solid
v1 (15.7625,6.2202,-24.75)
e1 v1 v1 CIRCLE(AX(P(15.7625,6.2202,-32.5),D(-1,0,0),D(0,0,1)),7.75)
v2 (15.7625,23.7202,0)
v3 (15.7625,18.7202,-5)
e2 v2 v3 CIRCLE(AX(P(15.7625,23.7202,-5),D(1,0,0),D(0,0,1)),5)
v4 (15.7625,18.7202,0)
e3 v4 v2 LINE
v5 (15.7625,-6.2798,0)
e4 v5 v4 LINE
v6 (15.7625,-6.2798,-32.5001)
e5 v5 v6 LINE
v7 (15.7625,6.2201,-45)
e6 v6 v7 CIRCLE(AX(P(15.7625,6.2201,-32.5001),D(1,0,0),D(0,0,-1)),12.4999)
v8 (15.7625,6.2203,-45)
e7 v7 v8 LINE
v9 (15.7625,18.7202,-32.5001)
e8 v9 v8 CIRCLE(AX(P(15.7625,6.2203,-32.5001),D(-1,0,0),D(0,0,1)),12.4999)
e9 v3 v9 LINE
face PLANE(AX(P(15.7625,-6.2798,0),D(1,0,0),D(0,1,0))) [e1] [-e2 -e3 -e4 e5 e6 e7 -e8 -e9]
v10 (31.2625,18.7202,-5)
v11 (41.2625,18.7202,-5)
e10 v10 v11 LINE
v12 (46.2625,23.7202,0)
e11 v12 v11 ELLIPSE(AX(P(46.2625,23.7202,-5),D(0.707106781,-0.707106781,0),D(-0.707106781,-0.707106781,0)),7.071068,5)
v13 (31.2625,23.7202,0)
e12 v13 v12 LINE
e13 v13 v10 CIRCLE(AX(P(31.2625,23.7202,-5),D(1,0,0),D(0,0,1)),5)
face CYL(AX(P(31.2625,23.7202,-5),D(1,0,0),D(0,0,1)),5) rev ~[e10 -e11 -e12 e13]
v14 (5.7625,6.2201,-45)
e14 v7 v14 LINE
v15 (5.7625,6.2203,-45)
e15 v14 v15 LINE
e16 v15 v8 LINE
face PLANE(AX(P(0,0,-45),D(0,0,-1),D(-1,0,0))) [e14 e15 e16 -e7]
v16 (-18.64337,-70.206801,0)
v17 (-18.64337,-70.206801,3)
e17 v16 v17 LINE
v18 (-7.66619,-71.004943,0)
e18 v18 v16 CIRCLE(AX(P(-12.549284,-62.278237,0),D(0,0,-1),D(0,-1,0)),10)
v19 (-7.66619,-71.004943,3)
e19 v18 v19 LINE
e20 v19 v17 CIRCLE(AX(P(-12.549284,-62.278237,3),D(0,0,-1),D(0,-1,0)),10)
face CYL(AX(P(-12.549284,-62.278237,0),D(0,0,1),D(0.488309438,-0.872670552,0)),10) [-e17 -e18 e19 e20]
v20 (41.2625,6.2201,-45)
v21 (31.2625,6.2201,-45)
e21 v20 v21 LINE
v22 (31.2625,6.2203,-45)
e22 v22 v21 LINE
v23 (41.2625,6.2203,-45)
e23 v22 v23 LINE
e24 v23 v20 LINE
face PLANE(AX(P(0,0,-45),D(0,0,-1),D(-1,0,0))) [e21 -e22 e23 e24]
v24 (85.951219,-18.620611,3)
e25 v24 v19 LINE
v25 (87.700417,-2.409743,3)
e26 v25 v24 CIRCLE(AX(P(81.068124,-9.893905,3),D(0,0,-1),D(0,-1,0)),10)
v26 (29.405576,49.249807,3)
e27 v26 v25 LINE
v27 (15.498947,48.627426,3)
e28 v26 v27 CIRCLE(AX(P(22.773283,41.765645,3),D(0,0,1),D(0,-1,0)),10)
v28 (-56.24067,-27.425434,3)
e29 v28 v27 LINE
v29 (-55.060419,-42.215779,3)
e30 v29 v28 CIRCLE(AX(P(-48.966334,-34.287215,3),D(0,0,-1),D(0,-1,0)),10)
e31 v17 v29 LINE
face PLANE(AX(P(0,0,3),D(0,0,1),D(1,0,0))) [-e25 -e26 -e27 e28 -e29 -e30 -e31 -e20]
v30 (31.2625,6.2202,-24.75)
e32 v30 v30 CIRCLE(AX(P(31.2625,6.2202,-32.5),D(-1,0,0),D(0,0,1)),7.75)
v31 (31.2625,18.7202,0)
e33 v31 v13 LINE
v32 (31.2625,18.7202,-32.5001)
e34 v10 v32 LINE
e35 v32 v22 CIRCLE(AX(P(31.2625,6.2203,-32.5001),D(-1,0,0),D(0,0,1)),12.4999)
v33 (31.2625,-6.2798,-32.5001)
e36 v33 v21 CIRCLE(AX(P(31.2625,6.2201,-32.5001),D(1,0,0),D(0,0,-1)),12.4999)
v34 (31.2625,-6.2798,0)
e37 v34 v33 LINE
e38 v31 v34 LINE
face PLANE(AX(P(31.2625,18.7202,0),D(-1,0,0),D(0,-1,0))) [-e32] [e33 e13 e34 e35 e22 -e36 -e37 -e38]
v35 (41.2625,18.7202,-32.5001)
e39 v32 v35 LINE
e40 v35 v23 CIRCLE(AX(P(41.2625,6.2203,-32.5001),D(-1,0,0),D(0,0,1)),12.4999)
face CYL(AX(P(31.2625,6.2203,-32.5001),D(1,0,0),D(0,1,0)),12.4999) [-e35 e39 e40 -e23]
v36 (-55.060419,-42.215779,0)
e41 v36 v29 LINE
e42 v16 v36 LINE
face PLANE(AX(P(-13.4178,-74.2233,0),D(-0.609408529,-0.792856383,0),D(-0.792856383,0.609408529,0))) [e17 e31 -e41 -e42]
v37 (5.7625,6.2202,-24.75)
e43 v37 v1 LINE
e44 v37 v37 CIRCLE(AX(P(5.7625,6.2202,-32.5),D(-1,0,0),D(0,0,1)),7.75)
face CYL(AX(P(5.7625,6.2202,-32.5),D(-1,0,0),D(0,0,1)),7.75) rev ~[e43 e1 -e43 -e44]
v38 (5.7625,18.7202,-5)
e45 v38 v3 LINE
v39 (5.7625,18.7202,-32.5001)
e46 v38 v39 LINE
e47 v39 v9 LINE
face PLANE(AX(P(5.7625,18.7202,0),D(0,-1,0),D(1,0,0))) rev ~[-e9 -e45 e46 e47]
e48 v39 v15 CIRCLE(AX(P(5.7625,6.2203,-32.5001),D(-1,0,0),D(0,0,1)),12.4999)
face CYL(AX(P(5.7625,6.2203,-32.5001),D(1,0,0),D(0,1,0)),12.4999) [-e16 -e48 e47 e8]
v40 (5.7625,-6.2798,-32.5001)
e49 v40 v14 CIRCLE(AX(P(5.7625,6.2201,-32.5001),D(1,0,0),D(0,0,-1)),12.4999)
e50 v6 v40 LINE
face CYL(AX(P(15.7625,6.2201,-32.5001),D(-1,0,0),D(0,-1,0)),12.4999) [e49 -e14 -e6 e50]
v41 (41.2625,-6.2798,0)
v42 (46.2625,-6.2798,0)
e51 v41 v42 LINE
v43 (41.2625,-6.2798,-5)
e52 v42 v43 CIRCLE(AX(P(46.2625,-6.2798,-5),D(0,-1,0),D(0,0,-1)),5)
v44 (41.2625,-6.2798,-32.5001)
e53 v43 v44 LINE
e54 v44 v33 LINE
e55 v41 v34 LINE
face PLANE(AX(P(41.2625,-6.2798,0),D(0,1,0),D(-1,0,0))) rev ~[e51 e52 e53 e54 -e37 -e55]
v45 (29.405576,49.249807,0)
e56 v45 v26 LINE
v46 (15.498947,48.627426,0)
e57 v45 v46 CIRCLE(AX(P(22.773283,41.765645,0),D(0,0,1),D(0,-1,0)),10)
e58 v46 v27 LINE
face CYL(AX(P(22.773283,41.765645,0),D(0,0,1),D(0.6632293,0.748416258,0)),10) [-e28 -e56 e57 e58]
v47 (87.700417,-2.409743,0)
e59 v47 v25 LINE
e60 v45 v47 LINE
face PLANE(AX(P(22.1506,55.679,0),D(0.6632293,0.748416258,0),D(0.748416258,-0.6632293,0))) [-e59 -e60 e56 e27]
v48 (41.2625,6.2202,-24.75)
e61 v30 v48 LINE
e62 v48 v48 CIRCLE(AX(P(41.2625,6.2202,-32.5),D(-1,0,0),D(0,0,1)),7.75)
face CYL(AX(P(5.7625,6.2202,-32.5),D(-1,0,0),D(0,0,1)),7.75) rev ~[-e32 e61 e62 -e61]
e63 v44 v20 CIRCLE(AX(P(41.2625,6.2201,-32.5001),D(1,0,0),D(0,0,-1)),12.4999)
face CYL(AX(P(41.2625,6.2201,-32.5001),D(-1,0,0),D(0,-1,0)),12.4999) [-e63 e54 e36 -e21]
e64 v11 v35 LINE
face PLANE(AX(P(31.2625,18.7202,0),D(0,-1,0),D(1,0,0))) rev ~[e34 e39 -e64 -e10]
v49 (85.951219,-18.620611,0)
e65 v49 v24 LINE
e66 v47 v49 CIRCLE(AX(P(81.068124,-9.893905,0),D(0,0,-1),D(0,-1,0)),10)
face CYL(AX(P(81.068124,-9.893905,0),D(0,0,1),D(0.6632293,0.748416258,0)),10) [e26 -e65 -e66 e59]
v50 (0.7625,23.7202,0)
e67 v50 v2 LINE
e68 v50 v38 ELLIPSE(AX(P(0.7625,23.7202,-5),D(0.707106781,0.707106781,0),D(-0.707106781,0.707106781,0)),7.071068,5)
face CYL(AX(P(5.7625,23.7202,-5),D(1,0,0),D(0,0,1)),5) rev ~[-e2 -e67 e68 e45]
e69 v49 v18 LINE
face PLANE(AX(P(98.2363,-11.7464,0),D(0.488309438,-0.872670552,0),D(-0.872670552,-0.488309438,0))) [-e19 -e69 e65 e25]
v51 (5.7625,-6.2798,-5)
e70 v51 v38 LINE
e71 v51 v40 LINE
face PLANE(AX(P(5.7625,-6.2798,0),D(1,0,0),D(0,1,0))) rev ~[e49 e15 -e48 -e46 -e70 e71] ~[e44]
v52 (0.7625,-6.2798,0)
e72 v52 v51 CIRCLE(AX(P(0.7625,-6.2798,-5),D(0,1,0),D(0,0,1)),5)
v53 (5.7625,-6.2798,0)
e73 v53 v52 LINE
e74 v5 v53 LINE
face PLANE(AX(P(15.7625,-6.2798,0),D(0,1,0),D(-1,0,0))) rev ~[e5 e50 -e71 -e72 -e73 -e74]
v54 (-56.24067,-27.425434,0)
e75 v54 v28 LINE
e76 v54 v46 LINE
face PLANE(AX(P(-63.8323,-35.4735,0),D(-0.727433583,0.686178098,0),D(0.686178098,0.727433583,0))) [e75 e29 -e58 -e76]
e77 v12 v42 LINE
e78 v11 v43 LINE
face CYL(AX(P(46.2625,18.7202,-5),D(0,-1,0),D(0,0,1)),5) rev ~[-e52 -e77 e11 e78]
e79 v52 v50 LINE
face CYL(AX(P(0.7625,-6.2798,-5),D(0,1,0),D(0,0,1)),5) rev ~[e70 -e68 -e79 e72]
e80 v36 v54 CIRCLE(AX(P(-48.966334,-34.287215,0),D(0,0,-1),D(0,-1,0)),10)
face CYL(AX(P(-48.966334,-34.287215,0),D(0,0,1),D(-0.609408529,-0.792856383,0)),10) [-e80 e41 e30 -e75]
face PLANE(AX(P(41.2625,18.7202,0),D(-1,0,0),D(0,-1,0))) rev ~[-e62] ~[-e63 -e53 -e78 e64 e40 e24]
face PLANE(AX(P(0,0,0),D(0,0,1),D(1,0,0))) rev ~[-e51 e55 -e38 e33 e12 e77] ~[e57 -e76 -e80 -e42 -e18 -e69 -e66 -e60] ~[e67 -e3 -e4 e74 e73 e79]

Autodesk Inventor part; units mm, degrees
ref_plane "YZ Plane" through (0, 0, 0) normal (1, 0, 0) x (0, 1, 0)
ref_plane "XZ Plane" through (0, 0, 0) normal (0, 1, 0) x (-1, 0, 0)
ref_plane "XY Plane" through (0, 0, 0) normal (0, 0, 1) x (1, 0, 0)
sketch "Sketch1" plane through (0, 0, 0) normal (0, 0, 1) x (1, 0, 0)
  line L0 (22.1506, 55.679) -> (98.2363, -11.7464)
  line L1 (98.2363, -11.7464) -> (-13.4178, -74.2233)
  line L2 (-13.4178, -74.2233) -> (-63.8323, -35.4735)
  line L3 (-63.8323, -35.4735) -> (22.1506, 55.679)
  point P0 (0, 0)
extrude "Extrusion1" add sketch "Sketch1" along normal blind 3
fillet "Fillet1" radius 10 4 edges at (98.2363, -11.7464, 1.5) (-13.4178, -74.2233, 1.5) (22.1506, 55.679, 1.5) (-63.8323, -35.4735, 1.5)
sketch "Sketch2" plane through (0, 0, 0) normal (0, 0, -1) x (-1, 0, 0)
  line L0 (-41.2625, -6.2798) -> (-5.7625, -6.2798)
  line L1 (-5.7625, -6.2798) -> (-5.7625, 18.7202)
  line L2 (-5.7625, 18.7202) -> (-41.2625, 18.7202)
  line L3 (-41.2625, 18.7202) -> (-41.2625, -6.2798)
  line L4 (-41.2625, -6.2798) -> (-5.7625, 18.7202) construction
  line L5 (-5.7625, -6.2798) -> (-41.2625, 18.7202) construction
  line L6 (-31.2625, -6.2798) -> (-15.7625, -6.2798)
  line L7 (-15.7625, -6.2798) -> (-15.7625, 18.7202)
  line L8 (-15.7625, 18.7202) -> (-31.2625, 18.7202)
  line L9 (-31.2625, 18.7202) -> (-31.2625, -6.2798)
  line L10 (-31.2625, -6.2798) -> (-15.7625, 18.7202) construction
  line L11 (-15.7625, -6.2798) -> (-31.2625, 18.7202) construction
  point P0 (0, 0)
  point P1 (-23.5125, 6.2202)
  point P2 (-31.2625, -6.2798)
  point P3 (-15.7625, -6.2798)
  dimension "d3" = 10
  dimension "d4" = 25
  dimension "d8" = 15.5
extrude "Extrusion2" add sketch "Sketch2" along normal blind 45 contours L3 L2 L9 L0 | L7 L2 L1 L0
fillet "Fillet2" radius 12.5 4 edges at (10.7625, 18.7202, -45) (36.2625, 18.7202, -45) (10.7625, -6.2798, -45) (36.2625, -6.2798, -45)
sketch "Sketch3" plane through (5.7625, -6.2798, 0) normal (-1, 0, 0) x (0, 0, 1)
  arc A0 (-32.5, 25) -> (-32.5, 0) centre (-32.5, 12.5) ccw projected
  circle A1 centre (-32.5, 12.5) radius 7.75
  point P0 (0, 6.2798)
  dimension "d9" = 15.5
extrude "Extrusion3" cut sketch "Sketch3" against normal up to surface (35.5 mm away)
fillet "Fillet3" radius 5 4 edges at (5.7625, 6.2202, 0) (10.7625, 18.7202, 0) (41.2625, 6.2202, 0) (36.2625, 18.7202, 0)
properties part number "Upper Back Plate"
